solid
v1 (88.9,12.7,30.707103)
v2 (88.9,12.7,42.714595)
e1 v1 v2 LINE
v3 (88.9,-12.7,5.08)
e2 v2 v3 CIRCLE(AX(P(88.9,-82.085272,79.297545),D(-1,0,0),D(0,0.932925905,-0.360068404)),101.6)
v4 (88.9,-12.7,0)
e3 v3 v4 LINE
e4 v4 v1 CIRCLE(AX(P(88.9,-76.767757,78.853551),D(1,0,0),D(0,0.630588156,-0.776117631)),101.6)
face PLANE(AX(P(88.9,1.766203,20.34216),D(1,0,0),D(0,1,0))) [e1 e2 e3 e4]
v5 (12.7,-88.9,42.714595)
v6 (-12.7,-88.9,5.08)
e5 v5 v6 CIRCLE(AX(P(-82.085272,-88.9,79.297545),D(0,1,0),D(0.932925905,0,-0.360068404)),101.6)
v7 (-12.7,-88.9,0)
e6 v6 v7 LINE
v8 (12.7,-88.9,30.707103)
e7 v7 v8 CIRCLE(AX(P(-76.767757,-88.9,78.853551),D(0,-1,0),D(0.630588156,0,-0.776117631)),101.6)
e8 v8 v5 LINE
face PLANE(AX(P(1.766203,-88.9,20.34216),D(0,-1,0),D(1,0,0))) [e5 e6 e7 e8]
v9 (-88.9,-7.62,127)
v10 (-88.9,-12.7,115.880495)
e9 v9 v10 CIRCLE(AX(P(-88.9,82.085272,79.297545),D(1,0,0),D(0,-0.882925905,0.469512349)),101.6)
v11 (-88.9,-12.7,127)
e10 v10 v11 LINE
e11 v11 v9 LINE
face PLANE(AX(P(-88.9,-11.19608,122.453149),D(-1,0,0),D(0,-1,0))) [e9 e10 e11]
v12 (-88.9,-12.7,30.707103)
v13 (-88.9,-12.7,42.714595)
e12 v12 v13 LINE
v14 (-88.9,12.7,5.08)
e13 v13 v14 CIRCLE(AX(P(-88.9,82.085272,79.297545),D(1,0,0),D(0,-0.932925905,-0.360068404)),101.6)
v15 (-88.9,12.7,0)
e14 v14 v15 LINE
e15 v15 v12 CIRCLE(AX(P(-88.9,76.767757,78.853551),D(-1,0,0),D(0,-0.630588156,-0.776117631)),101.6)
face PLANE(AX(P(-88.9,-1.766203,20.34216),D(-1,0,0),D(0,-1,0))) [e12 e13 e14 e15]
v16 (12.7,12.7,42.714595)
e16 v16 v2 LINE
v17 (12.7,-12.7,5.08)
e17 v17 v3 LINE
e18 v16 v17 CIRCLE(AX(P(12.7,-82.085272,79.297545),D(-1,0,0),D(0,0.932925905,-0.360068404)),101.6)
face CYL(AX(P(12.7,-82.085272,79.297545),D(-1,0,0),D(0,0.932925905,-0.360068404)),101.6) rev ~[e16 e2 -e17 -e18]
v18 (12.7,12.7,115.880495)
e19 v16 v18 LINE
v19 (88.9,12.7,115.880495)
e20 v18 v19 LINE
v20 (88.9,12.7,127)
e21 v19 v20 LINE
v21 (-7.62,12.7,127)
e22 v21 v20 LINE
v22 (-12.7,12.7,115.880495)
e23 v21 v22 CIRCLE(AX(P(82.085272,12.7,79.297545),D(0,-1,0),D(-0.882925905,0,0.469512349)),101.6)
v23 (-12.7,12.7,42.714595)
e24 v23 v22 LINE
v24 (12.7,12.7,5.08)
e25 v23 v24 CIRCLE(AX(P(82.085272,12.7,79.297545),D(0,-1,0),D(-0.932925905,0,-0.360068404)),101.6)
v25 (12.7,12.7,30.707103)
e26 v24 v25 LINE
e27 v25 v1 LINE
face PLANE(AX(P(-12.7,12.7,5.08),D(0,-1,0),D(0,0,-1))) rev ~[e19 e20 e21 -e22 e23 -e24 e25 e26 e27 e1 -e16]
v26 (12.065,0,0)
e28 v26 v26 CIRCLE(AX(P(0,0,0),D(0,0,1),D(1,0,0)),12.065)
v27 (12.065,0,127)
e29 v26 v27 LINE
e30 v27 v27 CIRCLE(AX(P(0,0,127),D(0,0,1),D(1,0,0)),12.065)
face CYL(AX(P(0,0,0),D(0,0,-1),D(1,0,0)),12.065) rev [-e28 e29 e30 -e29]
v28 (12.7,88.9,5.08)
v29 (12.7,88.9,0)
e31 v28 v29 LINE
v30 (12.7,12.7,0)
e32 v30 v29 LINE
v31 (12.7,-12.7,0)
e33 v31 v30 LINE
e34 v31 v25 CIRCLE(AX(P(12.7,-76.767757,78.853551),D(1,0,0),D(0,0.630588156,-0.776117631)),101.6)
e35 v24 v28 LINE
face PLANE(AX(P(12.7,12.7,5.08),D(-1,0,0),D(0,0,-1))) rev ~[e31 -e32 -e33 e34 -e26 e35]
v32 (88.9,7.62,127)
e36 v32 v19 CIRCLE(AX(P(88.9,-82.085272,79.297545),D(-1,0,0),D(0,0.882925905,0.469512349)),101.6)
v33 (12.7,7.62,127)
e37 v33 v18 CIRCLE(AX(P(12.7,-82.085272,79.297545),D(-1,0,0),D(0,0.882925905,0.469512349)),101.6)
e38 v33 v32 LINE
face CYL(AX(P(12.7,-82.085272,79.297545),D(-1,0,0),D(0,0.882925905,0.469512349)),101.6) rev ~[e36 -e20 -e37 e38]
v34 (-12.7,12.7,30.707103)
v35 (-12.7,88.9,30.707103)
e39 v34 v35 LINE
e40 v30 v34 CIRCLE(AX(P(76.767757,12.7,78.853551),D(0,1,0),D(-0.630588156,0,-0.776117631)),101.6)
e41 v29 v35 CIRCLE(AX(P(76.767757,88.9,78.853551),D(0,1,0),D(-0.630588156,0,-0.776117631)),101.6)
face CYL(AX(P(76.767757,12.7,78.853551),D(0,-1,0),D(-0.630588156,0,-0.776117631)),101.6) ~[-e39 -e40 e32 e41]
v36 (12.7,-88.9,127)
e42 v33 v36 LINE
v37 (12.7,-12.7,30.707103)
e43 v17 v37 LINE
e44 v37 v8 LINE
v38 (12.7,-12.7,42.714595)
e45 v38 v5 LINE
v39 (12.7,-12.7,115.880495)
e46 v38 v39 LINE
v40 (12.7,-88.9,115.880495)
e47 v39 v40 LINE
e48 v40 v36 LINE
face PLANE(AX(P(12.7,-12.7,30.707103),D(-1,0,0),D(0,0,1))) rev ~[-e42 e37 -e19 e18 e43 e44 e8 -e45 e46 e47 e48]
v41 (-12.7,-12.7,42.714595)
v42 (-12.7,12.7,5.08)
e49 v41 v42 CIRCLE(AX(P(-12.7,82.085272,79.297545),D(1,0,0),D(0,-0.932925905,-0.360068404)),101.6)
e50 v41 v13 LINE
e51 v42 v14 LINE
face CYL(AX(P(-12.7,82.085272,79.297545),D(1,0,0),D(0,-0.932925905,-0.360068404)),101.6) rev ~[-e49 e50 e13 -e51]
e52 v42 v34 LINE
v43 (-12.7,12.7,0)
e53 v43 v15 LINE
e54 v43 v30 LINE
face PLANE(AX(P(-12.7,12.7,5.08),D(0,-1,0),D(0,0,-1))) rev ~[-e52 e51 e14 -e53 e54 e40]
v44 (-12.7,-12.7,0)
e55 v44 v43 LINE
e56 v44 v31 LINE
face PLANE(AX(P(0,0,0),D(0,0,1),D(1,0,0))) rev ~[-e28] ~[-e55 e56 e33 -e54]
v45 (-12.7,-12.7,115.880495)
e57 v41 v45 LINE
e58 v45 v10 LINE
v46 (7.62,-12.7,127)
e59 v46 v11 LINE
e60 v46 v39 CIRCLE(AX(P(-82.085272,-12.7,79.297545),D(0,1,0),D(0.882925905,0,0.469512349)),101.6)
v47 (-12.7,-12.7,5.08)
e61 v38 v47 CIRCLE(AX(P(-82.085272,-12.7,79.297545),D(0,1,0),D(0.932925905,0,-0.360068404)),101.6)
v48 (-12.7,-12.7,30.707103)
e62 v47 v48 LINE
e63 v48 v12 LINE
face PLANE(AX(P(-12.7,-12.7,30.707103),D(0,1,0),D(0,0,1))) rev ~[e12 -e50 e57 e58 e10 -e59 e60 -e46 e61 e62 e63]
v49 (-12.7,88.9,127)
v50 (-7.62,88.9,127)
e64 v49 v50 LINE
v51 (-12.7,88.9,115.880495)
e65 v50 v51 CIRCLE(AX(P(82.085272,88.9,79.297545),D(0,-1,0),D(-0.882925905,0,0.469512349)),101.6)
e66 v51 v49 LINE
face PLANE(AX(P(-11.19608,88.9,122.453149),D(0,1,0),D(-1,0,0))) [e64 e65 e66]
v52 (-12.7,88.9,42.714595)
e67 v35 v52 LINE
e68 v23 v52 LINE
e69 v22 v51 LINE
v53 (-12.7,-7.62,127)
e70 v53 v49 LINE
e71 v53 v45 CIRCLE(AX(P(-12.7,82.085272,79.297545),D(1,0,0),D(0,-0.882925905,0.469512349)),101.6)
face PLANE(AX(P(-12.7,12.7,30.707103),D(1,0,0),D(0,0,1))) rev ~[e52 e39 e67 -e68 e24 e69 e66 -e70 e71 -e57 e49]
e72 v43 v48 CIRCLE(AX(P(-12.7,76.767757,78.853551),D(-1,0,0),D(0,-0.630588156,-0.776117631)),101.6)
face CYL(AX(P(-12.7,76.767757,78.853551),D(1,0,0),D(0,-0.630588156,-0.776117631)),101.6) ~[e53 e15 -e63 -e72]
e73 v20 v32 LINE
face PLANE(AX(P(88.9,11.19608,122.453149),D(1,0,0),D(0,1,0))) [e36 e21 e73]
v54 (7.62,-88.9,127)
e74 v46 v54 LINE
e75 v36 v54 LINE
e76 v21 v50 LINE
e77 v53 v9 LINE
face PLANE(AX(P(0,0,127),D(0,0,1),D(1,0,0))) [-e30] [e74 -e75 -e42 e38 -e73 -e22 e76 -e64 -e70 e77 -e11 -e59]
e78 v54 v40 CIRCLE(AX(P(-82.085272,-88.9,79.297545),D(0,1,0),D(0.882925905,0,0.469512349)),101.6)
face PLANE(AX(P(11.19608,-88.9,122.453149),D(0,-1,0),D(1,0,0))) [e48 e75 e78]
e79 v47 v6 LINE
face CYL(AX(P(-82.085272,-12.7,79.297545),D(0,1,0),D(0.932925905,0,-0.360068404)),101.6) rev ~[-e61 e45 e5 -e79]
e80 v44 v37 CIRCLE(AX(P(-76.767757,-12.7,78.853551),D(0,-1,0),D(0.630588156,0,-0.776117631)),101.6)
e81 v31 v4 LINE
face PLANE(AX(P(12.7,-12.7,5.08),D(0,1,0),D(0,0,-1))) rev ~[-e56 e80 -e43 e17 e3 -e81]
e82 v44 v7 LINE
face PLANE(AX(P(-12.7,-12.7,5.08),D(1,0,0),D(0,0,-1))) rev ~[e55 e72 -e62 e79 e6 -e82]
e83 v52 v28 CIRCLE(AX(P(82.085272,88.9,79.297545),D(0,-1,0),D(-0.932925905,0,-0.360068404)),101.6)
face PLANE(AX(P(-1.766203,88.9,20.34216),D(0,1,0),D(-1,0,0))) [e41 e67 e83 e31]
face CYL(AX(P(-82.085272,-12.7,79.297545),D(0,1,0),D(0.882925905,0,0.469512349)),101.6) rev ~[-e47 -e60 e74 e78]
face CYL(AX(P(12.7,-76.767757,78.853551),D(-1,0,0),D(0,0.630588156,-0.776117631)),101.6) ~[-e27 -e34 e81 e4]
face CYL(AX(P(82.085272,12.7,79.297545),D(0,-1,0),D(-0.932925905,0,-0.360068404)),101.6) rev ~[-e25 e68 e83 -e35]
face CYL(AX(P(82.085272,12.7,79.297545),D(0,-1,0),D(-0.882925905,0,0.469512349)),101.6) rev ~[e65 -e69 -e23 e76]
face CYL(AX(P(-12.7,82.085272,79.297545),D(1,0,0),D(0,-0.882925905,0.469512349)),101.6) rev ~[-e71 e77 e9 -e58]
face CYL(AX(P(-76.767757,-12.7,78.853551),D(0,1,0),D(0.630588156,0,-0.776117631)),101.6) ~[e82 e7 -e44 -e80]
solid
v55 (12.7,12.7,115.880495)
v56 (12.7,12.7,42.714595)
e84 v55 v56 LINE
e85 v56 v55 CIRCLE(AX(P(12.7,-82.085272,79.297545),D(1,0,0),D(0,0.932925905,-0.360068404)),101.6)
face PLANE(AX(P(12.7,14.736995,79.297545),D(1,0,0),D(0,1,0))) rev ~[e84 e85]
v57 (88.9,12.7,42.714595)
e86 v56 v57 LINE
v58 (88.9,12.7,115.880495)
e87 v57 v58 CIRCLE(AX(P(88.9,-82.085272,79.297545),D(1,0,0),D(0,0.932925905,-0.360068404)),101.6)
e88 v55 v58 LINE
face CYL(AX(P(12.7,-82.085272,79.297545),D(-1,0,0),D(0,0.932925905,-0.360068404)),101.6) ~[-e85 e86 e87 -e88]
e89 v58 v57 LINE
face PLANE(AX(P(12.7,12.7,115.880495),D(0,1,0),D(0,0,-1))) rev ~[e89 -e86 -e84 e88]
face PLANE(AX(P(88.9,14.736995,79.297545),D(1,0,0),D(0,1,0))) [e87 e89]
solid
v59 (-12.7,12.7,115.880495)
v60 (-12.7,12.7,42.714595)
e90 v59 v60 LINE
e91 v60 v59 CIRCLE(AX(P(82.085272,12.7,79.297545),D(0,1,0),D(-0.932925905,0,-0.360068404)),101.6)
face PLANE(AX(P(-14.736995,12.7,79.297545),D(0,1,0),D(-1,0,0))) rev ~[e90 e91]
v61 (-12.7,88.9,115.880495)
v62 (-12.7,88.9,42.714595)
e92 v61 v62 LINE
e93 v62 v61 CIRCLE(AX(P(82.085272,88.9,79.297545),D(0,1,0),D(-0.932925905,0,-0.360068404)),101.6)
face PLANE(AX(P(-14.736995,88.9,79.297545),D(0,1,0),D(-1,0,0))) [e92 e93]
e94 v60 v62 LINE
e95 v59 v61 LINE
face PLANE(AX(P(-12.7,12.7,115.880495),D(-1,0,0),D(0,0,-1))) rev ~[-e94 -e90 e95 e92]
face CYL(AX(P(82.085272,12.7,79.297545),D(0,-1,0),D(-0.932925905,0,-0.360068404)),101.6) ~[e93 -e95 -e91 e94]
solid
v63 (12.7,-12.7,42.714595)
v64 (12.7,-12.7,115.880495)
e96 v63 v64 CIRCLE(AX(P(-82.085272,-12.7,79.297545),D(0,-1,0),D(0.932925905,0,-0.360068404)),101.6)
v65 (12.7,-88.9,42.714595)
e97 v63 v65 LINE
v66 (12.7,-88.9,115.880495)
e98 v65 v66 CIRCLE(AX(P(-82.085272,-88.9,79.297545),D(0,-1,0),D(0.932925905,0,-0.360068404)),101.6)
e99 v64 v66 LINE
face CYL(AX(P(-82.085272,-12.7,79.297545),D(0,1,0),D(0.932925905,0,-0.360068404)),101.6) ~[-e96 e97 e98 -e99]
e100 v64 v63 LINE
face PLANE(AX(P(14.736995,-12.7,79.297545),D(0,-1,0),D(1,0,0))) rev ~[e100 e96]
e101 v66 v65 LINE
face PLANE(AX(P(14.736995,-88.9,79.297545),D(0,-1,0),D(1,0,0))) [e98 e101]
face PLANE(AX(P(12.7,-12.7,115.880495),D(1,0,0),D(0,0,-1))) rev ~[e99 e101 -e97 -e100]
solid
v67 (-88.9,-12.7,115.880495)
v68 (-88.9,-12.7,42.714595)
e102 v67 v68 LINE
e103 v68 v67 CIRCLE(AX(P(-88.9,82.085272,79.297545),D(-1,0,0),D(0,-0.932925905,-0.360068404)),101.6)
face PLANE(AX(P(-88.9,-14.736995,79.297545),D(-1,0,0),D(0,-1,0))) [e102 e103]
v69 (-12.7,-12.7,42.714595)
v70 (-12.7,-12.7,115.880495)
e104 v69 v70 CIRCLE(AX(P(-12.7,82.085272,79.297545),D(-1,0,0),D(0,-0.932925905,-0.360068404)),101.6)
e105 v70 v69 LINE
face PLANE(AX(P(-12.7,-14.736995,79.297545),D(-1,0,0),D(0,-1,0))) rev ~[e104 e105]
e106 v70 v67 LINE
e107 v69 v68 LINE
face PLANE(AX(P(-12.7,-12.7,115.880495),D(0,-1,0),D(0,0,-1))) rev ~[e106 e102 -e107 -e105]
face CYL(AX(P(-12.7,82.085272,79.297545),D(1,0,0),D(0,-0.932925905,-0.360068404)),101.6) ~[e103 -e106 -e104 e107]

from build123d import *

# Parameters (mm, degrees)
F0_W     = 25.4
F0_H     = 25.4
F0_R     = 12.065
F1_DEPTH = 127
F6_DEPTH = 76.2
F7_DEPTH = 76.2
F8_DEPTH = 76.2
F9_DEPTH = 76.2


with BuildPart() as f1:
    # F0 (on Top) → F1 (new body)
    with BuildSketch(Plane.XY):
        Rectangle(F0_W, F0_H)
        Circle(F0_R, mode=Mode.SUBTRACT)
    extrude(amount=F1_DEPTH)

    # F2 (on face) → F6, piece 2 (join)
    with BuildSketch(Plane.YZ.offset(12.7)):
        with BuildLine():
            Line((-12.7, 5.08), (-12.7, 0))
            ThreePointArc((-12.7, 0), (1.5203011847, 14.096003508), (12.7, 30.7071026612))
            Line((12.7, 30.7071026612), (12.7, 42.7145954924))
            ThreePointArc((12.7, 42.7145954924), (2.1292313467, 22.460256229), (-12.7, 5.08))
        make_face()
        with BuildLine():
            Line((12.7, 115.8804951624), (12.7, 127))
            Line((12.7, 127), (7.62, 127))
            ThreePointArc((7.62, 127), (10.3273951692, 121.5167228804), (12.7, 115.8804951624))
        make_face()
    extrude(amount=F6_DEPTH)

    # F3 (on face) → F7 (join)
    with BuildSketch(Plane.XZ.offset(12.7)):
        with BuildLine():
            Line((-12.7, 5.08), (-12.7, 0))
            ThreePointArc((-12.7, 0), (1.5203011847, 14.096003508), (12.7, 30.7071026612))
            Line((12.7, 30.7071026612), (12.7, 42.7145954924))
            ThreePointArc((12.7, 42.7145954924), (2.1292313467, 22.460256229), (-12.7, 5.08))
        make_face()
        with BuildLine():
            Line((12.7, 115.8804951624), (12.7, 127))
            Line((12.7, 127), (7.62, 127))
            ThreePointArc((7.62, 127), (10.3273951692, 121.5167228804), (12.7, 115.8804951624))
        make_face()
    extrude(amount=F7_DEPTH)

    # F4 (on face) → F8, piece 2 (join)
    with BuildSketch(Plane(origin=(-12.7, 0, 0), x_dir=(0, -1, 0), z_dir=(-1, 0, 0))):
        with BuildLine():
            ThreePointArc((12.7, 42.7145954924), (2.1292313467, 22.460256229), (-12.7, 5.08))
            Line((-12.7, 5.08), (-12.7, 0))
            ThreePointArc((-12.7, 0), (1.5203011847, 14.096003508), (12.7, 30.7071026612))
            Line((12.7, 30.7071026612), (12.7, 42.7145954924))
        make_face()
        with BuildLine():
            ThreePointArc((7.62, 127), (10.3273951692, 121.5167228804), (12.7, 115.8804951624))
            Line((12.7, 115.8804951624), (12.7, 127))
            Line((12.7, 127), (7.62, 127))
        make_face()
    extrude(amount=F8_DEPTH)

    # F5 (on face) → F9, piece 2 (join)
    with BuildSketch(Plane(origin=(0, 12.7, 0), x_dir=(-1, 0, 0), z_dir=(0, 1, 0))):
        with BuildLine():
            Line((-12.7, 5.08), (-12.7, 0))
            ThreePointArc((-12.7, 0), (1.5203011847, 14.096003508), (12.7, 30.7071026612))
            Line((12.7, 30.7071026612), (12.7, 42.7145954924))
            ThreePointArc((12.7, 42.7145954924), (2.1292313467, 22.460256229), (-12.7, 5.08))
        make_face()
        with BuildLine():
            Line((12.7, 115.8804951624), (12.7, 127))
            Line((12.7, 127), (7.62, 127))
            ThreePointArc((7.62, 127), (10.3273951692, 121.5167228804), (12.7, 115.8804951624))
        make_face()
    extrude(amount=F9_DEPTH)


with BuildPart() as f6:
    # F2 (on face) → F6 (new body)
    with BuildSketch(Plane.YZ.offset(12.7)):
        with BuildLine():
            Line((12.7, 115.8804951624), (12.7, 42.7145954924))
            ThreePointArc((12.7, 42.7145954924), (19.5147280356, 79.2975453274), (12.7, 115.8804951624))
        make_face()
    extrude(amount=F6_DEPTH)


with BuildPart() as f7:
    # F3 (on face) → F7, piece 2 (new body)
    with BuildSketch(Plane.XZ.offset(12.7)):
        with BuildLine():
            Line((12.7, 115.8804951624), (12.7, 42.7145954924))
            ThreePointArc((12.7, 42.7145954924), (19.5147280356, 79.2975453274), (12.7, 115.8804951624))
        make_face()
    extrude(amount=F7_DEPTH)


with BuildPart() as f8:
    # F4 (on face) → F8 (new body)
    with BuildSketch(Plane(origin=(-12.7, 0, 0), x_dir=(0, -1, 0), z_dir=(-1, 0, 0))):
        with BuildLine():
            Line((12.7, 115.8804951624), (12.7, 42.7145954924))
            ThreePointArc((12.7, 42.7145954924), (19.5147280356, 79.2975453274), (12.7, 115.8804951624))
        make_face()
    extrude(amount=F8_DEPTH)


with BuildPart() as f9:
    # F5 (on face) → F9 (new body)
    with BuildSketch(Plane(origin=(0, 12.7, 0), x_dir=(-1, 0, 0), z_dir=(0, 1, 0))):
        with BuildLine():
            Line((12.7, 115.8804951624), (12.7, 42.7145954924))
            ThreePointArc((12.7, 42.7145954924), (19.5147280356, 79.2975453274), (12.7, 115.8804951624))
        make_face()
    extrude(amount=F9_DEPTH)


solid = Compound([f1.part, f6.part, f7.part, f8.part, f9.part])
